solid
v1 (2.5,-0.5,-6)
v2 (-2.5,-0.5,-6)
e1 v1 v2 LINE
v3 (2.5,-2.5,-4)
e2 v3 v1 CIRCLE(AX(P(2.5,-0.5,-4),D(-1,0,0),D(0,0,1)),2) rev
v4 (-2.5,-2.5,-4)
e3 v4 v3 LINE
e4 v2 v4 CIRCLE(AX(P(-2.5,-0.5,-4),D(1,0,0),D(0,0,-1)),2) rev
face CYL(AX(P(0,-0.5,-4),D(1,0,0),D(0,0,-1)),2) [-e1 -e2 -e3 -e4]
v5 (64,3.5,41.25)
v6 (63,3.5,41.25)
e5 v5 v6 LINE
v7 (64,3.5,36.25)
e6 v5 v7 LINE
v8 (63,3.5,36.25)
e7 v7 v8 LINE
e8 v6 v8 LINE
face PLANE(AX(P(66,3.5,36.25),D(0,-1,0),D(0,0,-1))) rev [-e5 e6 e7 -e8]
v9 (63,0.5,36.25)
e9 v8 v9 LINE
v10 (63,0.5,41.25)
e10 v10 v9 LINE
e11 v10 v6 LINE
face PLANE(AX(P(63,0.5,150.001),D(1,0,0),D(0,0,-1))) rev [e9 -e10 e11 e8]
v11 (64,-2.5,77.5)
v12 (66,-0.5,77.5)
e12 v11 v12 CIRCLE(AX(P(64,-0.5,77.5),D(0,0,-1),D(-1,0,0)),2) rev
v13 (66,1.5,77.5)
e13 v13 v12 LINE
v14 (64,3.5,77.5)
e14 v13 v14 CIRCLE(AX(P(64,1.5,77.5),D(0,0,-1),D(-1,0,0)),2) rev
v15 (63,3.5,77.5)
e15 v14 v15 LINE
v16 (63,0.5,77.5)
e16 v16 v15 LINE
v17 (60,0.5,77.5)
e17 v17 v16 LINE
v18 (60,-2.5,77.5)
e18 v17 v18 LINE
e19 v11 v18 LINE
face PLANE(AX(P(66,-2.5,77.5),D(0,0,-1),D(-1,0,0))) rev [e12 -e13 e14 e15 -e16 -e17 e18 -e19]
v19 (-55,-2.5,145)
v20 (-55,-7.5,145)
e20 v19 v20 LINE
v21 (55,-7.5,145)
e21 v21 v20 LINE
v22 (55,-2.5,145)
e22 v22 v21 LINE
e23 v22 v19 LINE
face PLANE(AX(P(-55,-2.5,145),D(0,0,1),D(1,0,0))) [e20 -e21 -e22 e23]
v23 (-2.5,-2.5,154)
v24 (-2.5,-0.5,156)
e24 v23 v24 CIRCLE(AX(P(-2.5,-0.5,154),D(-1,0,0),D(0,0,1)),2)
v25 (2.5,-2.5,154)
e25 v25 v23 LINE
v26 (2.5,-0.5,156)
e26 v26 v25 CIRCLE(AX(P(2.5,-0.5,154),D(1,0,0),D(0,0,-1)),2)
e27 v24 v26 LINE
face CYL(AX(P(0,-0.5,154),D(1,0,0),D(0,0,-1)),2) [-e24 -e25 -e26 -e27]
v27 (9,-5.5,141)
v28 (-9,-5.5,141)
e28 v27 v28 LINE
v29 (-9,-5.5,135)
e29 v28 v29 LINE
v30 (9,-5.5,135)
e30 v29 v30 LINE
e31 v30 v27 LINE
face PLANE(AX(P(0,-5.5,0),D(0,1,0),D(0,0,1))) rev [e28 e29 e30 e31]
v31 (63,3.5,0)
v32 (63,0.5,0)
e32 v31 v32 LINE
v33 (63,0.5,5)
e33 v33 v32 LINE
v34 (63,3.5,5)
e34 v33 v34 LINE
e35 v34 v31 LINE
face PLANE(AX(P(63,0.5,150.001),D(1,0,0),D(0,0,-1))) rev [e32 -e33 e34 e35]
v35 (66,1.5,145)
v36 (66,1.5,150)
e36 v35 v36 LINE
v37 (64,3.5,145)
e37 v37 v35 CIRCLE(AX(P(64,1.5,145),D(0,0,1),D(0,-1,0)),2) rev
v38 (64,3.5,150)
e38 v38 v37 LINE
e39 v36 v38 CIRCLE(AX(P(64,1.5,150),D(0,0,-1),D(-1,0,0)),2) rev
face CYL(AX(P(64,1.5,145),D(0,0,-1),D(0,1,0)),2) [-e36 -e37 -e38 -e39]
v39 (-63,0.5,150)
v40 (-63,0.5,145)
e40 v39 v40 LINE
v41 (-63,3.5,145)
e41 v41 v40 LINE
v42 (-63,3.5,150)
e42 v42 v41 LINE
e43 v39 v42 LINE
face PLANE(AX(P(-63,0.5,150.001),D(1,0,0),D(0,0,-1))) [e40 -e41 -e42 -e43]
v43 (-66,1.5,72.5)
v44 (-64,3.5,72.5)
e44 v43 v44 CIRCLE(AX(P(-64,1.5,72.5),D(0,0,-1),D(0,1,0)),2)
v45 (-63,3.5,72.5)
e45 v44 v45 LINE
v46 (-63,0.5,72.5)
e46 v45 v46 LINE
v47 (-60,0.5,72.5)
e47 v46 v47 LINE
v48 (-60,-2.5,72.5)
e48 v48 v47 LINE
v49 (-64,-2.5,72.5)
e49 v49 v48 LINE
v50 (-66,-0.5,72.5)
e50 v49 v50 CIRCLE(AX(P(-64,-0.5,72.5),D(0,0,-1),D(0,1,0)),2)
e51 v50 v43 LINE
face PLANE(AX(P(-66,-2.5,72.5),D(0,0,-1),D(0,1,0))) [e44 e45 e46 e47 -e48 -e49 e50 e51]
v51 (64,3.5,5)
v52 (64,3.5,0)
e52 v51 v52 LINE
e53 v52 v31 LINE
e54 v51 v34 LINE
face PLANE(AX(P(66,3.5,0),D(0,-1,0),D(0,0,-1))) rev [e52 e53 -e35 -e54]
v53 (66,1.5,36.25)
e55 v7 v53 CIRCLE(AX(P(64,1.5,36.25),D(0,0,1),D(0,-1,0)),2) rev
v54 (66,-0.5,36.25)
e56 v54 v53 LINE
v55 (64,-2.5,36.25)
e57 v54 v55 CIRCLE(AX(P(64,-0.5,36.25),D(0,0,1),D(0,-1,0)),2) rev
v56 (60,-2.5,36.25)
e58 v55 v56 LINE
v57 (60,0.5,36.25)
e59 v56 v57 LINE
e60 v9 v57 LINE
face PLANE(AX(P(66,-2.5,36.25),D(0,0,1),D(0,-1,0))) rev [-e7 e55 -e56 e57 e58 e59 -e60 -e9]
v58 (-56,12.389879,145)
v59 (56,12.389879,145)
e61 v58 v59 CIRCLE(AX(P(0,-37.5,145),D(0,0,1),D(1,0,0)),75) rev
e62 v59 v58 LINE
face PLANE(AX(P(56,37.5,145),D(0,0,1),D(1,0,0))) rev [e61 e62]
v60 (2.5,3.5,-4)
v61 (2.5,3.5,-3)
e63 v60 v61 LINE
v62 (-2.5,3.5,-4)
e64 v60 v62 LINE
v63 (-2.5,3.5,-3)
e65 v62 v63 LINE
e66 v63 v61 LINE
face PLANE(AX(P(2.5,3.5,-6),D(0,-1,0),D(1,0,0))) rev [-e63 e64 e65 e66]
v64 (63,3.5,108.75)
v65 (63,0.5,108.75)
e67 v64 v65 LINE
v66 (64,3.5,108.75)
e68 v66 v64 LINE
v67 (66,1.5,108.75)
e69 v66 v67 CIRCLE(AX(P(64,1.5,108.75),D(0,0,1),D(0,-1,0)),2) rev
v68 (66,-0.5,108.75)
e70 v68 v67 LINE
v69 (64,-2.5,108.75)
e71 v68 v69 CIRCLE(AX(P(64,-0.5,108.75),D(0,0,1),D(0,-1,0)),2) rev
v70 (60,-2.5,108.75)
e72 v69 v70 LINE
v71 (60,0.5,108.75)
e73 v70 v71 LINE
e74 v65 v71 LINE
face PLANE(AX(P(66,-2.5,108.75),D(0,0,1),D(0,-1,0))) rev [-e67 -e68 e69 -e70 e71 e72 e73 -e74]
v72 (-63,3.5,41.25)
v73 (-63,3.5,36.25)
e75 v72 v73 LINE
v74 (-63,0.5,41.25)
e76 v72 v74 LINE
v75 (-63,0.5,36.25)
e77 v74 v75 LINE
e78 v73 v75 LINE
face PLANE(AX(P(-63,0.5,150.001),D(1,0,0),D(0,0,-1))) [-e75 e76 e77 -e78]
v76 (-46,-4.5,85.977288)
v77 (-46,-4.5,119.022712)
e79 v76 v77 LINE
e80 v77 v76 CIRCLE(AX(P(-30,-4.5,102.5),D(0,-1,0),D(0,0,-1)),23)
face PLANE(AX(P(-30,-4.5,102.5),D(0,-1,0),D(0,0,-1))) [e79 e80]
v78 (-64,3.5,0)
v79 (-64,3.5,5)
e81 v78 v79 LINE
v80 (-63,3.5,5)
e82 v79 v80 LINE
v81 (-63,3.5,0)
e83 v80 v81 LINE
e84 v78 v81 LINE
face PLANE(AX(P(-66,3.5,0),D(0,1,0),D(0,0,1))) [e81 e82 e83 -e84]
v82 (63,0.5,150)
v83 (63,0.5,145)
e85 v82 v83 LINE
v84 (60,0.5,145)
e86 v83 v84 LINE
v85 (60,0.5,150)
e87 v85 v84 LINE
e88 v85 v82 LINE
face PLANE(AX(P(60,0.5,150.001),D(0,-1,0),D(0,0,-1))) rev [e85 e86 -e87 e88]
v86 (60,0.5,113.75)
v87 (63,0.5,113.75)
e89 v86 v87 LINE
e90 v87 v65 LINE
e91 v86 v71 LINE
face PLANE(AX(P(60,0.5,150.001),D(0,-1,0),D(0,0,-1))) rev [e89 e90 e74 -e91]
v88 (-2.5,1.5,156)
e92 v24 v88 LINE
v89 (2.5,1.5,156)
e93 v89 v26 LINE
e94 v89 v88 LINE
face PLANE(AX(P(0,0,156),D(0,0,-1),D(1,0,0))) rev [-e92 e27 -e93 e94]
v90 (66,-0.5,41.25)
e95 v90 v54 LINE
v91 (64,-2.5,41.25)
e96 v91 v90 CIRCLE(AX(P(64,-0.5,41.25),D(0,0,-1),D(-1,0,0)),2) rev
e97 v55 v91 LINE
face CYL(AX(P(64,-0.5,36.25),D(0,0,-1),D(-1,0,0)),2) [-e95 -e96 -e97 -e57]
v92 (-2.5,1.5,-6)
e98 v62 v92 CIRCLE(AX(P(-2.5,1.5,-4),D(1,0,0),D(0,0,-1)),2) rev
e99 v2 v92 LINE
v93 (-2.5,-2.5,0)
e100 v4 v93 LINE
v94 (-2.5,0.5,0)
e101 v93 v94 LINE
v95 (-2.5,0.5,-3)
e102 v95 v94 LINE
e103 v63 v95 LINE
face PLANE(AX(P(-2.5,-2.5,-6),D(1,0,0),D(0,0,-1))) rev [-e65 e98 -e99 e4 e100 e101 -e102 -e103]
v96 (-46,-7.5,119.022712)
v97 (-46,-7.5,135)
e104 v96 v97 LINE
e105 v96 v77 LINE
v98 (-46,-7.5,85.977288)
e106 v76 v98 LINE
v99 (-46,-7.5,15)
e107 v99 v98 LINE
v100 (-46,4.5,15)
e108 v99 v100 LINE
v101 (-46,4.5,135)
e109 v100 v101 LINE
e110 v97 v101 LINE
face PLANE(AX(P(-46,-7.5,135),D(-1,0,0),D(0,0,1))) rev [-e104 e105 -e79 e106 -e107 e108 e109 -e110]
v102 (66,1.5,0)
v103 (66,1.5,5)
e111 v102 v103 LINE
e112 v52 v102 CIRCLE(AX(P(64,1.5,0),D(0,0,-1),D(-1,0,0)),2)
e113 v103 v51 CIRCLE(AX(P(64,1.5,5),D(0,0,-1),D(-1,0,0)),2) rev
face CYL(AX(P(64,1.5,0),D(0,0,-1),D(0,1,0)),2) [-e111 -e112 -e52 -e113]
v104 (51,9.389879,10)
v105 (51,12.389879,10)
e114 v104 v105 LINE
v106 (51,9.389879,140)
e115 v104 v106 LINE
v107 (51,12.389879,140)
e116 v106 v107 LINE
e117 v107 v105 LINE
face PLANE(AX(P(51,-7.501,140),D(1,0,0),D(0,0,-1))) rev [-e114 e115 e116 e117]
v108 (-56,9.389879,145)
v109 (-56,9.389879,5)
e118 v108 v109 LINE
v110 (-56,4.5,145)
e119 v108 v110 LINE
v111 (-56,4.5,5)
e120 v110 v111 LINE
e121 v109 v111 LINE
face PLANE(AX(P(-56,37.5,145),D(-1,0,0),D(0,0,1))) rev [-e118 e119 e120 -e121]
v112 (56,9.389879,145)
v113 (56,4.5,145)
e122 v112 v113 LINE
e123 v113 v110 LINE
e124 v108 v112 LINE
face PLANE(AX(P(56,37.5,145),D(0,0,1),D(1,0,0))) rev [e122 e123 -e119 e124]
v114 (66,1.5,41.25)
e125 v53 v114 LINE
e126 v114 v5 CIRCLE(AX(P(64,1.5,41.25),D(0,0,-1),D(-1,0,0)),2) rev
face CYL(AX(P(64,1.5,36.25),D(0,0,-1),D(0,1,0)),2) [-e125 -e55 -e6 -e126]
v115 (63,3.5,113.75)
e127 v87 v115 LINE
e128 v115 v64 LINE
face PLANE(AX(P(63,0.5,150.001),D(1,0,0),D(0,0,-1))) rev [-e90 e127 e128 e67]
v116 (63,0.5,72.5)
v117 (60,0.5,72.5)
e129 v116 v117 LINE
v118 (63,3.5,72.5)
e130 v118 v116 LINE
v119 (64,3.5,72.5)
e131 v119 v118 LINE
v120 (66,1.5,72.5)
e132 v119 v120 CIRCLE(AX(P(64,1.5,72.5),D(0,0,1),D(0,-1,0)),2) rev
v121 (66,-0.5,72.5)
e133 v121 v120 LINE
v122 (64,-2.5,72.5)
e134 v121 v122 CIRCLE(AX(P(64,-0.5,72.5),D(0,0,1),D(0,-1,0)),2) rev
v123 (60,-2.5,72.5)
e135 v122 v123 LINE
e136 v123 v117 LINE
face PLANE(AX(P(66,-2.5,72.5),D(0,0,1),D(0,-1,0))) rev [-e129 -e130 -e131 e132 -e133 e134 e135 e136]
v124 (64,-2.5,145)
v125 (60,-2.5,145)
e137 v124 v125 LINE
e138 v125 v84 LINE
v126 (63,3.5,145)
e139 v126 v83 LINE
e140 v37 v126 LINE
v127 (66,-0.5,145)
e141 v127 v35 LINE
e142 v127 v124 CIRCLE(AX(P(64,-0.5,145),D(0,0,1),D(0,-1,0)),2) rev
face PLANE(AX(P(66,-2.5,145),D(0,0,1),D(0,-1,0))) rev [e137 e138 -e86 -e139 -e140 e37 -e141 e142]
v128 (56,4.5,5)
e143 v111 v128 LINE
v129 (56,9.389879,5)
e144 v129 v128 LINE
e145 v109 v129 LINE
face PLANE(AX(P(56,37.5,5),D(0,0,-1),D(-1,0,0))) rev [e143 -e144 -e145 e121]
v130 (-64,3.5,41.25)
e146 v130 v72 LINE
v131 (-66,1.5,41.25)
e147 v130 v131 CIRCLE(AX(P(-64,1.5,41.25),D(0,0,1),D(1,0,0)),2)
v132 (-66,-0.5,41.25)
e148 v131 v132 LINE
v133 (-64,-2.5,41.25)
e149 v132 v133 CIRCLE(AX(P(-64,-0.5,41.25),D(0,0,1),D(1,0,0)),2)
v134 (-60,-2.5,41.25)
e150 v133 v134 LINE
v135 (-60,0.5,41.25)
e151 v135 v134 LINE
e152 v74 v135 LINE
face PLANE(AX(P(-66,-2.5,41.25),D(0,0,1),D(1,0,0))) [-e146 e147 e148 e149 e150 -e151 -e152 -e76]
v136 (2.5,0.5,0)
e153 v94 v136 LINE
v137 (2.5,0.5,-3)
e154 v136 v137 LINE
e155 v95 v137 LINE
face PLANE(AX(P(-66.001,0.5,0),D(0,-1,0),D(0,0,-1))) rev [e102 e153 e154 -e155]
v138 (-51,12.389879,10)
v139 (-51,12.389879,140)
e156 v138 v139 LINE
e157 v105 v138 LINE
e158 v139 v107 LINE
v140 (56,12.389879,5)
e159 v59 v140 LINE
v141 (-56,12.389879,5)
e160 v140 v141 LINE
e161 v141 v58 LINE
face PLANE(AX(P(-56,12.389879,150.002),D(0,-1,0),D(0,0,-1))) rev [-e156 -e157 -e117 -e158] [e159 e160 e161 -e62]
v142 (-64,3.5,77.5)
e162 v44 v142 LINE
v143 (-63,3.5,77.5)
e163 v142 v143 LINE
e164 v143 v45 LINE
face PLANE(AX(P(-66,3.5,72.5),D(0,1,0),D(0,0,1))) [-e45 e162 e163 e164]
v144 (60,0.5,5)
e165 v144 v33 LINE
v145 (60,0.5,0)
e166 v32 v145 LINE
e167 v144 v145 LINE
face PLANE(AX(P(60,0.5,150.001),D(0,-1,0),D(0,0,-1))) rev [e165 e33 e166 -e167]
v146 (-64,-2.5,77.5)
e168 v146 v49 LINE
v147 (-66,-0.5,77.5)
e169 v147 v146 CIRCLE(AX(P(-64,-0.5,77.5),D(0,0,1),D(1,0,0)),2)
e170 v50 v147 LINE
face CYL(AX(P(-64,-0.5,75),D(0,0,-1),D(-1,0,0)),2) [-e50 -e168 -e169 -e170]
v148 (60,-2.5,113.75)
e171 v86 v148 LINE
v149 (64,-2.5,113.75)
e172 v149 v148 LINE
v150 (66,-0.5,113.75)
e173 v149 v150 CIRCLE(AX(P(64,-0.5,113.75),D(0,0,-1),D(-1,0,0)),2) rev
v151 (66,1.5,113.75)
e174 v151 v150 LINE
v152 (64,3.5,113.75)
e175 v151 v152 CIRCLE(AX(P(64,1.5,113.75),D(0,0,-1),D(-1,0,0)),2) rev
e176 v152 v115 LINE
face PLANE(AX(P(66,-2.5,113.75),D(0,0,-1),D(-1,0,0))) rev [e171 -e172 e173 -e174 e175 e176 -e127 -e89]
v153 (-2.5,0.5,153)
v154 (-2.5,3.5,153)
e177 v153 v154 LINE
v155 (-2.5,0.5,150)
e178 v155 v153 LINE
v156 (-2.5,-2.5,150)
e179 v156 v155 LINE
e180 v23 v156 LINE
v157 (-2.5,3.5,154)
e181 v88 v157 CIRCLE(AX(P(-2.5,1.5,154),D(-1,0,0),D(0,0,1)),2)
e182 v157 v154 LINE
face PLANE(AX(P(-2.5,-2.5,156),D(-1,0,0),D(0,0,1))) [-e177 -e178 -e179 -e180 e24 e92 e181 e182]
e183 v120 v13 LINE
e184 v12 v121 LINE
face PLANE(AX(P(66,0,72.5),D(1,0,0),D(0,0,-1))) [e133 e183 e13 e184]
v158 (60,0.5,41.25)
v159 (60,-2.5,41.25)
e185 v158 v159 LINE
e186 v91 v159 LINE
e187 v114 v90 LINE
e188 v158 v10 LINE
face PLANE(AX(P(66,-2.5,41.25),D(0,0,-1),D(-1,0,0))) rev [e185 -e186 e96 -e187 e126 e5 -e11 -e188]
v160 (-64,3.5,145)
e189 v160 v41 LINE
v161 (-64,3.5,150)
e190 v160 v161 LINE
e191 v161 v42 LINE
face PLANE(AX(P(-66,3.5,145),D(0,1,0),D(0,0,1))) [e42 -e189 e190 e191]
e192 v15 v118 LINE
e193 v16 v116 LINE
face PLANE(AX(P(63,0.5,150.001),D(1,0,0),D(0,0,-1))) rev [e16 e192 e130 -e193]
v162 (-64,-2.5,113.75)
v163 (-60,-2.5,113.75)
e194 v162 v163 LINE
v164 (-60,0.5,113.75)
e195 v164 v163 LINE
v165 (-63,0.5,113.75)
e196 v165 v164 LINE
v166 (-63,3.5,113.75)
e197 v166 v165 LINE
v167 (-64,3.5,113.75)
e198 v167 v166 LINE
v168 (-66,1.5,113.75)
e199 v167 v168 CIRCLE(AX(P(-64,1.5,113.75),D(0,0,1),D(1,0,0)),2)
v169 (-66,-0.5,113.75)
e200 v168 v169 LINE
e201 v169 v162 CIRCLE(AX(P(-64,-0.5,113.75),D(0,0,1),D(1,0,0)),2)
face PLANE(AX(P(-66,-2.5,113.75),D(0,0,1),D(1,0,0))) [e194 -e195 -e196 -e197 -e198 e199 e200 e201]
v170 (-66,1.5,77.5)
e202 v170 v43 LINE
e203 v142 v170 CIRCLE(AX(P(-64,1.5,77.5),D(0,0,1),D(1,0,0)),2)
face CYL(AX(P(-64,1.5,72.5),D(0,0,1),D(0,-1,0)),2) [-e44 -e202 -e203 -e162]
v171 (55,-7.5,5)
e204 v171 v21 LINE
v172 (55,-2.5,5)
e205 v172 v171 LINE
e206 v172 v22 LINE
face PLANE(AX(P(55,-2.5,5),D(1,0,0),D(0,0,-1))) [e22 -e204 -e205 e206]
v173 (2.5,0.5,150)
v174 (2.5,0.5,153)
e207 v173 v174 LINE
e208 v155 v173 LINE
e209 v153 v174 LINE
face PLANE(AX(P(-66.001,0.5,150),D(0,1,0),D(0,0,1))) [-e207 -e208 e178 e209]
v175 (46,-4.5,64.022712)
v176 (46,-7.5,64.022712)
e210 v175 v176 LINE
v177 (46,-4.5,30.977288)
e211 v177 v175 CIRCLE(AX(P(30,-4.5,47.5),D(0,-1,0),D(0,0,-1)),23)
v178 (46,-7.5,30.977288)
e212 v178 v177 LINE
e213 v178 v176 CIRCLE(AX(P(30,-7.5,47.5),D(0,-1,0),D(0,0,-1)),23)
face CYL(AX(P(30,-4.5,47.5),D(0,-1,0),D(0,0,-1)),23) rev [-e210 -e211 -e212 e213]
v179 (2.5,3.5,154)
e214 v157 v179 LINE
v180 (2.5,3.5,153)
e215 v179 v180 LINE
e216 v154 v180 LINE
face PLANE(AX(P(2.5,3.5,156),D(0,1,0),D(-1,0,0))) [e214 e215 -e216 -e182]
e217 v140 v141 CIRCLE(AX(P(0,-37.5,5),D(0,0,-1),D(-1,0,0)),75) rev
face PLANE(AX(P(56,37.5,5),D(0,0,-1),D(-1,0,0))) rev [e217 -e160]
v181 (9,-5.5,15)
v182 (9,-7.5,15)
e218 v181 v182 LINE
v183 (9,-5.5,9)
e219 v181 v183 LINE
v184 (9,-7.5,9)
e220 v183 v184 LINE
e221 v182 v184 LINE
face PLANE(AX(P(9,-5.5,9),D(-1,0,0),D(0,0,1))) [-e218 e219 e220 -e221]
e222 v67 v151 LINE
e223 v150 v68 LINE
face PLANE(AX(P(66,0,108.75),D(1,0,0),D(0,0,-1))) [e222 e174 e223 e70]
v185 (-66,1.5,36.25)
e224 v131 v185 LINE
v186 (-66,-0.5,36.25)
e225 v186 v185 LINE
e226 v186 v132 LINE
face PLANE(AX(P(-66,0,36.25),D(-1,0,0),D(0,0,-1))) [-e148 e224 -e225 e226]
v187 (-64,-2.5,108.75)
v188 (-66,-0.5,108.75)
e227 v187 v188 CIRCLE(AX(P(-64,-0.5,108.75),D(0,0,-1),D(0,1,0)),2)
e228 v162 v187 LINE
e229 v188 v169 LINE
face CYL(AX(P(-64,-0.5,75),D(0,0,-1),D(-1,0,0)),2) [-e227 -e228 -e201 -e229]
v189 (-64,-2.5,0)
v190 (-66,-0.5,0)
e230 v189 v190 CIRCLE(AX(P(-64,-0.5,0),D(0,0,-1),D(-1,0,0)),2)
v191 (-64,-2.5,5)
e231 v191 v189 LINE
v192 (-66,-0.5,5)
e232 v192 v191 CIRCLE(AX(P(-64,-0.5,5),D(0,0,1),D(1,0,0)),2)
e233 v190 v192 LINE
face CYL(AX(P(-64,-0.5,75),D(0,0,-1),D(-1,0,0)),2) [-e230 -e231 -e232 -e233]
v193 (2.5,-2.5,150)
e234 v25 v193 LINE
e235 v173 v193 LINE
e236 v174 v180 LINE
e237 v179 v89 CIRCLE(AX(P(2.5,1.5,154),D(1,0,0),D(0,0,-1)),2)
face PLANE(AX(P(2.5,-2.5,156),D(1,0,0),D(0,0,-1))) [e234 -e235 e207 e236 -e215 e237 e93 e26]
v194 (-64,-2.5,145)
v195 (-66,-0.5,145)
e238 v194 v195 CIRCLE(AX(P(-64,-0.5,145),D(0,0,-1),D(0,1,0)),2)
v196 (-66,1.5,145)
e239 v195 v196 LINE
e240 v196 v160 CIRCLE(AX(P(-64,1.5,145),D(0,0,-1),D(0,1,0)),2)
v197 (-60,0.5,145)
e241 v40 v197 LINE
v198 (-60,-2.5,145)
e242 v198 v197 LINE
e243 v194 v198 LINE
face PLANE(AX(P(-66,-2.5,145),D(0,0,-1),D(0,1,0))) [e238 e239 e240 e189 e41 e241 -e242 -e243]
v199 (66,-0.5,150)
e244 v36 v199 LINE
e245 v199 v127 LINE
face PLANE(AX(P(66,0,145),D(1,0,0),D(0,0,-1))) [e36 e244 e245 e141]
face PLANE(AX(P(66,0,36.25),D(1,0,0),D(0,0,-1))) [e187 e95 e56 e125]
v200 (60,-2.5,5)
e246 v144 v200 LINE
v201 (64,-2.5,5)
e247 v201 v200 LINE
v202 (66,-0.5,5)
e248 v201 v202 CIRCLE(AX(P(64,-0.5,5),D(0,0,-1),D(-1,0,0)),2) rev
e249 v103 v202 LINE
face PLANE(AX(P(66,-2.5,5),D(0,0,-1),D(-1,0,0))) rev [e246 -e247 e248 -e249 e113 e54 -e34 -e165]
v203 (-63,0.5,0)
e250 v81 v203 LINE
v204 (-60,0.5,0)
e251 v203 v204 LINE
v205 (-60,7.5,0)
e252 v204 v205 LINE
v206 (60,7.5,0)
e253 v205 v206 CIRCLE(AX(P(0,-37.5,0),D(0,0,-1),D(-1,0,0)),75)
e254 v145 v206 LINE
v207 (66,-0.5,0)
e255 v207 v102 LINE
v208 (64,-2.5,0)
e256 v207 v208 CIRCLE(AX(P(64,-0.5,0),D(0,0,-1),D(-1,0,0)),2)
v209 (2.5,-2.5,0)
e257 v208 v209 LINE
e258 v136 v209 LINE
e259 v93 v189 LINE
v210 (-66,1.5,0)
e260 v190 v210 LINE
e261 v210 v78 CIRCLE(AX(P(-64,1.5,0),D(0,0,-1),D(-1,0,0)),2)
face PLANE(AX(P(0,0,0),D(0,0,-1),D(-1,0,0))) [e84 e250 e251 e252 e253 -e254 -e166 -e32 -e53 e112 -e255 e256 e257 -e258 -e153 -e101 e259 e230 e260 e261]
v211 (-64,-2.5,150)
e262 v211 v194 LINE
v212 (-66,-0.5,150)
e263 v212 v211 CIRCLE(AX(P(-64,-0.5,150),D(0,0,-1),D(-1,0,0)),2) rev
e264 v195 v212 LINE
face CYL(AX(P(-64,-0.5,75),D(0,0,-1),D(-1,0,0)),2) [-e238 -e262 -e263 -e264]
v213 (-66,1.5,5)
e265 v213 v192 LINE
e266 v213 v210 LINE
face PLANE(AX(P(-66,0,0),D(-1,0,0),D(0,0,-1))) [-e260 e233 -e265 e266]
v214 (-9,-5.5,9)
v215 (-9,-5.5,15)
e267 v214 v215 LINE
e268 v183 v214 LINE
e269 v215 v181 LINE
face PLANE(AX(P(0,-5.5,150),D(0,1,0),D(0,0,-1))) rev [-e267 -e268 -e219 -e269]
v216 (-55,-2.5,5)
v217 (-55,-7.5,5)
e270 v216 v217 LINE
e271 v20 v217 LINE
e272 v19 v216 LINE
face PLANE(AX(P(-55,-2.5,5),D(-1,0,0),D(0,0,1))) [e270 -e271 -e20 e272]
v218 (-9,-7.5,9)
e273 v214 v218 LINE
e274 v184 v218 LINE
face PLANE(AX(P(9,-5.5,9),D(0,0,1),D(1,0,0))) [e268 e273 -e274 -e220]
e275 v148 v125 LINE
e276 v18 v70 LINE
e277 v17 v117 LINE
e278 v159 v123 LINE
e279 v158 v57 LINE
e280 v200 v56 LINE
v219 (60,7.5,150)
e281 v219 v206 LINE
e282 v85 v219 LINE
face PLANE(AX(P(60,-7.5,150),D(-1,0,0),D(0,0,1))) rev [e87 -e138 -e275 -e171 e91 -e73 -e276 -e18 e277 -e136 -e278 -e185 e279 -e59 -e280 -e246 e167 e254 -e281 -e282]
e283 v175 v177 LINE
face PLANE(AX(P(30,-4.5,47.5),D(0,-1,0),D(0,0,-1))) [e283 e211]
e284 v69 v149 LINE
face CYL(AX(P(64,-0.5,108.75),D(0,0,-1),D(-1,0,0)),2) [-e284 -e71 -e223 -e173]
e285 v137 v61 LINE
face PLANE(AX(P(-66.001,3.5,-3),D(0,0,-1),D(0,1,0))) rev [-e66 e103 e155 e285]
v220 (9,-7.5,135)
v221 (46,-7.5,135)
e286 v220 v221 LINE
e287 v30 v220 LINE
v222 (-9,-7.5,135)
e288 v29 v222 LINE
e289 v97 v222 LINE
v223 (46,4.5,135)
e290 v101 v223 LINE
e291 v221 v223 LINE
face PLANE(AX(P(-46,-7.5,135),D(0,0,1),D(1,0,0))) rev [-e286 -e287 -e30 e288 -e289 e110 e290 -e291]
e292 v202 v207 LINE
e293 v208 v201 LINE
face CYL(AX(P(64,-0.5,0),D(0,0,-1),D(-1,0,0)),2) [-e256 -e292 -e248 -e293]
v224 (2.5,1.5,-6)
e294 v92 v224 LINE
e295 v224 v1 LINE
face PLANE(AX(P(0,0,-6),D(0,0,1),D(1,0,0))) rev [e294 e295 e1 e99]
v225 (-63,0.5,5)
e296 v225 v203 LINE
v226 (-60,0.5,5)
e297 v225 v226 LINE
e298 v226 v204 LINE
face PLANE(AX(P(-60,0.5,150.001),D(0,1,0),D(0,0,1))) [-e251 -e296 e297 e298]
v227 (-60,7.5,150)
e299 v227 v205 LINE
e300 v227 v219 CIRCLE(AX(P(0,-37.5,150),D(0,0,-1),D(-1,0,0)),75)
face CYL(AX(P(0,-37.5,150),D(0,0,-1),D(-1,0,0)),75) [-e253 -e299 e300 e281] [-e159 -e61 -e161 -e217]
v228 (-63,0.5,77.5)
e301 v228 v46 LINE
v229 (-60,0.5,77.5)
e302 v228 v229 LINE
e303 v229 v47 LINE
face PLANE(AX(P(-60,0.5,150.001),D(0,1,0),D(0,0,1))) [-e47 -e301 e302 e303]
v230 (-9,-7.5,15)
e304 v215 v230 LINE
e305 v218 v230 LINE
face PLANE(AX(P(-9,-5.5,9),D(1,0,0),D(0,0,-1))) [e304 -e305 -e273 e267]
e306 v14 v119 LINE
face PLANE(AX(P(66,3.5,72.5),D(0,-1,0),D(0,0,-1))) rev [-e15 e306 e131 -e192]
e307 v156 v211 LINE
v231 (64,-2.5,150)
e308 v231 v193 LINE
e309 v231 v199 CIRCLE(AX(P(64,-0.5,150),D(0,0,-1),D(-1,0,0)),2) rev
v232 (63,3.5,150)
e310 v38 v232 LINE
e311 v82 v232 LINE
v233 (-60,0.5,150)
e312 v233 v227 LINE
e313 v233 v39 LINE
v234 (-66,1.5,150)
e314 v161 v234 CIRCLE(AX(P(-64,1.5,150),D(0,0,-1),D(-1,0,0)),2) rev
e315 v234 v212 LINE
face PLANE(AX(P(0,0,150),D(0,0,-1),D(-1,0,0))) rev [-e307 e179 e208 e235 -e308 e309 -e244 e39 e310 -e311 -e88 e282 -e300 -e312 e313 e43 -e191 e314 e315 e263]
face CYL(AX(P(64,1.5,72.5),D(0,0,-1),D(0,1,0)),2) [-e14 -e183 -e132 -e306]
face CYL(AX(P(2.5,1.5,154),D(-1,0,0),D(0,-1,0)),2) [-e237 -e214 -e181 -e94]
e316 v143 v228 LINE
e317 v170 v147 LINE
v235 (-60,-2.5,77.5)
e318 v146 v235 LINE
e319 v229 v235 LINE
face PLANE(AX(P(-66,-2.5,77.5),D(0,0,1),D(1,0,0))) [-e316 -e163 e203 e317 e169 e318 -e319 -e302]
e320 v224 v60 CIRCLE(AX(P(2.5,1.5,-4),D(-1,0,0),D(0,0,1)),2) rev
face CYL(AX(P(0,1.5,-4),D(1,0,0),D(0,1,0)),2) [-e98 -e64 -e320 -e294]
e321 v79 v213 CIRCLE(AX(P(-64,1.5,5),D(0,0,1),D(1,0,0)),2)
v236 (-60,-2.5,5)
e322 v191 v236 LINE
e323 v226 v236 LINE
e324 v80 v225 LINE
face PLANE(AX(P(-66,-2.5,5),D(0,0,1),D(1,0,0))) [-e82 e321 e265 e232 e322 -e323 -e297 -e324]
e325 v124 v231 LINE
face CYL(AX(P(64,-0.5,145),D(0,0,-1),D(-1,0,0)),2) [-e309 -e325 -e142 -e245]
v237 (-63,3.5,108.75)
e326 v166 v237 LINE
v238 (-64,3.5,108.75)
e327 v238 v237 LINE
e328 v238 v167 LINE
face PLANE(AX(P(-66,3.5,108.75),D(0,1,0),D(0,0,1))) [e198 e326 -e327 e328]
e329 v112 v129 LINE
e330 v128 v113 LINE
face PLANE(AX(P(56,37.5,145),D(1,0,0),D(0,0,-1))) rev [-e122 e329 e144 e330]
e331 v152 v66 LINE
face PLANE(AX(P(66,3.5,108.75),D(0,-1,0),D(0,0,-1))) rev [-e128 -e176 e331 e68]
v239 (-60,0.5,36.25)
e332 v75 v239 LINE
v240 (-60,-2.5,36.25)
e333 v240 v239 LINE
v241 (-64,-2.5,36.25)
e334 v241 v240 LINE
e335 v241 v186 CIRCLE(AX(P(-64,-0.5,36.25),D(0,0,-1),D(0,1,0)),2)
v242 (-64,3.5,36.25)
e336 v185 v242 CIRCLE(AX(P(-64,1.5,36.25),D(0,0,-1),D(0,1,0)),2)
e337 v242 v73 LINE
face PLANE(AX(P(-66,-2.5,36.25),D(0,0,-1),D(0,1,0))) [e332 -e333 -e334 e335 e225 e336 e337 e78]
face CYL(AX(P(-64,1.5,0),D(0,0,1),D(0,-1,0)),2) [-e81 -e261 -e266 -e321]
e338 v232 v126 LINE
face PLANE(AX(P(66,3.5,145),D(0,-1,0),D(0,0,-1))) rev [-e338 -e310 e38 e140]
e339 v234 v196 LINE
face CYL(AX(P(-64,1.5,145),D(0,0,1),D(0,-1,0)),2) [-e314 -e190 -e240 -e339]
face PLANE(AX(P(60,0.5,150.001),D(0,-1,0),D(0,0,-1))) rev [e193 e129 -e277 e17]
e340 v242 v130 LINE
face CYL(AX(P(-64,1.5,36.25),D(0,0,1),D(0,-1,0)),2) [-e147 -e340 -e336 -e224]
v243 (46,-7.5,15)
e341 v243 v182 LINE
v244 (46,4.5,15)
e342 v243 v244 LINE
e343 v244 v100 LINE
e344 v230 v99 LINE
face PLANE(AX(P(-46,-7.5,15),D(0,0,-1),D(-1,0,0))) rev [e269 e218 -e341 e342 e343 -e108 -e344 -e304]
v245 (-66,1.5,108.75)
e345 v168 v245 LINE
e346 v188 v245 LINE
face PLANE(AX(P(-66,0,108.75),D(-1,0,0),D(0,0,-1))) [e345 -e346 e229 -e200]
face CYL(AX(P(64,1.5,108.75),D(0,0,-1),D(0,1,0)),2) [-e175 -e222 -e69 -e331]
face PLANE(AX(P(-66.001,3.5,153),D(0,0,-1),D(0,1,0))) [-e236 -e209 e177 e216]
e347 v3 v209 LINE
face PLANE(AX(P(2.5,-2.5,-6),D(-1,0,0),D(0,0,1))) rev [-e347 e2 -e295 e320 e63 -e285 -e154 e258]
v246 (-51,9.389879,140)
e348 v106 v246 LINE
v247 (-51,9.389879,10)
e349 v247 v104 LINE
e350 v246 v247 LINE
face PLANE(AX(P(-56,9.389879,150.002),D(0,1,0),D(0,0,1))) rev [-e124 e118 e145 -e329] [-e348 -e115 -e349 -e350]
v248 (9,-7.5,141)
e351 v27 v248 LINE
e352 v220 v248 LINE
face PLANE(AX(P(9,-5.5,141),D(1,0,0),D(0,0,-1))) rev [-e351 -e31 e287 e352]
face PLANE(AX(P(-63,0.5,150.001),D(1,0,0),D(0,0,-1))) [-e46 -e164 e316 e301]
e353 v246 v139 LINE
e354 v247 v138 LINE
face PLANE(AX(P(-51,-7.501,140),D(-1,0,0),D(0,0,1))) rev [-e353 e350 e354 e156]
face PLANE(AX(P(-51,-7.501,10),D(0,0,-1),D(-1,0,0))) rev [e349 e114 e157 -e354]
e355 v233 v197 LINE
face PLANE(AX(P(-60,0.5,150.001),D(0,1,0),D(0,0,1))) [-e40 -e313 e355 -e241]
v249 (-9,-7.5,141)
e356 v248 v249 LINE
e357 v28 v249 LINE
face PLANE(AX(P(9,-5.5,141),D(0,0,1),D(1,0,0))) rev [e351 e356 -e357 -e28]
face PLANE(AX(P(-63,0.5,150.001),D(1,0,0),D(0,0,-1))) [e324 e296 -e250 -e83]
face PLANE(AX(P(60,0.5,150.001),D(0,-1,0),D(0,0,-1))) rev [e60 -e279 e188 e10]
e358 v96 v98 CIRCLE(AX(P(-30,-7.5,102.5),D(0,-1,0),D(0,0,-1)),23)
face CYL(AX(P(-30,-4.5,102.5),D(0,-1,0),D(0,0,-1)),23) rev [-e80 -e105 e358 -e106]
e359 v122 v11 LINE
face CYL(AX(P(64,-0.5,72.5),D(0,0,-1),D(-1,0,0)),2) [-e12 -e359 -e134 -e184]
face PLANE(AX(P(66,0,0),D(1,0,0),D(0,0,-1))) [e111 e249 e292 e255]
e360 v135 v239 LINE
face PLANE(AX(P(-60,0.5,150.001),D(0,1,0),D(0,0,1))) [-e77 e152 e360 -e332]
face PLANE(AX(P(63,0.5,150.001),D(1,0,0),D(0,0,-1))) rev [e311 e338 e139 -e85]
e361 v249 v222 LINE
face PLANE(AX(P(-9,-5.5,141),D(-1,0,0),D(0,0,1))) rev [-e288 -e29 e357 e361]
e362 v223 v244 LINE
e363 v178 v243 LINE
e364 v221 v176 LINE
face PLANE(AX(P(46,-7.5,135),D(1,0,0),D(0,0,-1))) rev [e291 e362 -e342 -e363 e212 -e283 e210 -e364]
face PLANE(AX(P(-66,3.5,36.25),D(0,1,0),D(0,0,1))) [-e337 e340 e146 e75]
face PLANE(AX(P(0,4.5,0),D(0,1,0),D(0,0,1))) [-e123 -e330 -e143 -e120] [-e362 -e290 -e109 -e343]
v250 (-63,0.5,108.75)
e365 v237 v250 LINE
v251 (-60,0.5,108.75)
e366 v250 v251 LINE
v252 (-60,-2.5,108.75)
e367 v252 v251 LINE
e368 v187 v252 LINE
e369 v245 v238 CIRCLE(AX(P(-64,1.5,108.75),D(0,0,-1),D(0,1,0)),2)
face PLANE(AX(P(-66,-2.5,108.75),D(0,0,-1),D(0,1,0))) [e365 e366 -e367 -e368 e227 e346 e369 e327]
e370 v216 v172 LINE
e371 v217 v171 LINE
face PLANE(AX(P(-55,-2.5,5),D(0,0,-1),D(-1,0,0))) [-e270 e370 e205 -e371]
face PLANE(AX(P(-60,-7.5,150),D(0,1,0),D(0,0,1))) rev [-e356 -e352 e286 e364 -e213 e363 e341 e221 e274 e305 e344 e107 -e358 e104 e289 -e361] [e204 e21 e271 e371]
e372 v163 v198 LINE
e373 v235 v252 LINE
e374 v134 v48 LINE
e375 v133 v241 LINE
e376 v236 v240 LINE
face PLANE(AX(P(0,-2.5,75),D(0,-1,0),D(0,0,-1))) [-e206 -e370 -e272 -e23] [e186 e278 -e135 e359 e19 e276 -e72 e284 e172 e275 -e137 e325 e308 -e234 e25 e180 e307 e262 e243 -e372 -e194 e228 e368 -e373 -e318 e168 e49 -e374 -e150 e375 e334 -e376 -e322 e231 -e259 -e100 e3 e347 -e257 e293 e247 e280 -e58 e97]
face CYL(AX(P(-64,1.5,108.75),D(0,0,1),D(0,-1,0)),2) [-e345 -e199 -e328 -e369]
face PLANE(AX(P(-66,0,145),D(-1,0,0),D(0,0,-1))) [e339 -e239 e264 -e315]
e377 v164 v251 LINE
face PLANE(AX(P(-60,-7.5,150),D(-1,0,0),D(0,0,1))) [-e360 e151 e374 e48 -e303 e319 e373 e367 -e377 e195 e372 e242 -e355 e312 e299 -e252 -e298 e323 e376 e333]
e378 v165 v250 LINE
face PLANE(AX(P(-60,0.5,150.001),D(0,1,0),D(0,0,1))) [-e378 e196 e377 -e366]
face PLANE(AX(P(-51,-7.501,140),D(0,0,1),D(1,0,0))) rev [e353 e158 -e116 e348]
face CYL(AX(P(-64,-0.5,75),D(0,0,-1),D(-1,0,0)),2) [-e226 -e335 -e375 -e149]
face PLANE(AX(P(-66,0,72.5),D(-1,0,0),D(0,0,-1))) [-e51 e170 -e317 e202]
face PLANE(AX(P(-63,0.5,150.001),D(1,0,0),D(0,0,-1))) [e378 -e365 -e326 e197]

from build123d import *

# Parameters (mm, degrees)
SKETCH2_W              = 120
SKETCH2_H              = 15
BOSS_EXTRUDE1_DEPTH    = 150
BOSS_EXTRUDE3_DEPTH    = 150
SKETCH7_W              = 112
SKETCH7_H              = 140
CUT_EXTRUDE1_DEPTH     = 165.890873004
SKETCH8_W              = 92
SKETCH8_H              = 120
CUT_EXTRUDE2_DEPTH     = 165.890873004
SKETCH12_OUTSIDE_W     = 161.458
SKETCH12_OUTSIDE_H     = 191.458
SKETCH12_OUTSIDE_W_2   = 110
SKETCH12_OUTSIDE_H_2   = 140
CUT_EXTRUDE5_DEPTH     = 5
BOSS_EXTRUDE4_REACH    = 163.342
SKETCH14_W             = 112
SKETCH14_H             = 3
CUT_EXTRUDE6_REACH     = 165.495
SKETCH15_W             = 102
SKETCH15_H             = 130
SKETCH16_W             = 5
SKETCH16_H             = 6
BOSS_EXTRUDE5_DEPTH    = 6
CUT_EXTRUDE7_REACH     = 170.114
SKETCH17_W             = 3
SKETCH17_H             = 3
FILLET1_R              = 2
LPATTERN1_COUNT        = 5
LPATTERN1_PITCH        = 36.25
FILLET1_OF_LPATTERN1_R = 2
MIRROR1_DEPTH          = 5
MIRROR1_START          = 36.25
MIRROR1_2_DEPTH        = 5
MIRROR1_START_2        = 72.5
MIRROR1_3_DEPTH        = 5
MIRROR1_START_3        = 108.75
MIRROR1_4_DEPTH        = 5
MIRROR1_START_4        = 145
MIRROR1_5_DEPTH        = 5
SKETCH18_W             = 5
SKETCH18_H             = 6
BOSS_EXTRUDE6_DEPTH    = 6
CUT_EXTRUDE8_REACH     = 171.111
SKETCH19_W             = 3
SKETCH19_H             = 3
FILLET2_R              = 2
FILLET2_OF_MIRROR2_R   = 2
SKETCH20_R             = 23
CUT_EXTRUDE9_DEPTH     = 3
SKETCH21_W             = 18
SKETCH21_H             = 6
CUT_EXTRUDE10_DEPTH    = 2


# Read off the part's stored shape, not the designer's step: Mirror1
with BuildPart() as part:
    # Sketch2 → Boss-Extrude1 (new body)
    with BuildSketch(Plane.XY):
        Rectangle(SKETCH2_W, SKETCH2_H)
    extrude(amount=BOSS_EXTRUDE1_DEPTH)

    # Sketch4 → Boss-Extrude3 (add)
    with BuildSketch(Plane(origin=(0, 0, 0), x_dir=(-1, 0, 0), z_dir=(0, 0, -1))):
        with BuildLine():
            Line((-60, 7.5), (60, 7.5))
            ThreePointArc((60, 7.5), (0, 37.5), (-60, 7.5))
        make_face()
    extrude(amount=-BOSS_EXTRUDE3_DEPTH)

    # Sketch7 → Cut-Extrude1 (cut, through all)
    with BuildSketch(Plane(origin=(0, 4.5, 0), x_dir=(-1, 0, 0), z_dir=(0, -1, 0))):
        with Locations((0, -75)):
            Rectangle(SKETCH7_W, SKETCH7_H)
    extrude(amount=-CUT_EXTRUDE1_DEPTH, mode=Mode.SUBTRACT)

    # Sketch8 → Cut-Extrude2 (cut, through all)
    with BuildSketch(Plane(origin=(0, 4.5, 0), x_dir=(1, 0, 0), z_dir=(0, 1, 0))):
        with Locations((0, -75)):
            Rectangle(SKETCH8_W, SKETCH8_H)
    extrude(amount=-CUT_EXTRUDE2_DEPTH, mode=Mode.SUBTRACT)

    # Sketch12 outside → Cut-Extrude5 (cut)
    with BuildSketch(Plane(origin=(0, -7.5, 0), x_dir=(-1, 0, 0), z_dir=(0, -1, 0))):
        with Locations((0, -75)):
            Rectangle(SKETCH12_OUTSIDE_W, SKETCH12_OUTSIDE_H)
        with Locations((0, -75)):
            Rectangle(SKETCH12_OUTSIDE_W_2, SKETCH12_OUTSIDE_H_2, mode=Mode.SUBTRACT)
    extrude(amount=-CUT_EXTRUDE5_DEPTH, mode=Mode.SUBTRACT)

    # Sketch14 → Boss-Extrude4 (add, up to next)
    with BuildSketch(Plane.XY.offset(5), mode=Mode.PRIVATE) as boss_extrude4_sk1:
        with Locations((0, 10.889878733)):
            Rectangle(SKETCH14_W, SKETCH14_H)
    boss_extrude4_tool1 = extrude(boss_extrude4_sk1.sketch, amount=BOSS_EXTRUDE4_REACH, mode=Mode.PRIVATE) - part.part
    add(boss_extrude4_tool1.solids().sort_by_distance((0, 10.889879, 5))[0])

    # Sketch15 → Cut-Extrude6 (cut, up to next)
    with BuildSketch(Plane(origin=(0, 12.389878733, 0), x_dir=(1, 0, 0), z_dir=(0, 1, 0)), mode=Mode.PRIVATE) as cut_extrude6_sk1:
        with Locations((0, -75)):
            Rectangle(SKETCH15_W, SKETCH15_H)
    cut_extrude6_tool1 = extrude(cut_extrude6_sk1.sketch, amount=-CUT_EXTRUDE6_REACH, mode=Mode.PRIVATE) & part.part
    add(cut_extrude6_tool1.solids().sort_by_distance((0, 12.389879, 75))[0], mode=Mode.SUBTRACT)

    # Sketch16 → Boss-Extrude5 (add)
    with BuildSketch(Plane(origin=(60, 0, 0), x_dir=(0, 0, -1), z_dir=(1, 0, 0))):
        with Locations((-2.5, 0.5)):
            Rectangle(SKETCH16_W, SKETCH16_H)
    boss_extrude5 = extrude(amount=BOSS_EXTRUDE5_DEPTH)

    # Sketch17 → Cut-Extrude7 (cut, up to next)
    with BuildSketch(Plane(origin=(0, 0, 0), x_dir=(-1, 0, 0), z_dir=(0, 0, -1)), mode=Mode.PRIVATE) as cut_extrude7_sk1:
        with Locations((-61.5, 2)):
            Rectangle(SKETCH17_W, SKETCH17_H)
    cut_extrude7_tool1 = extrude(cut_extrude7_sk1.sketch, amount=-CUT_EXTRUDE7_REACH, mode=Mode.PRIVATE) & part.part
    cut_extrude7 = cut_extrude7_tool1.solids().sort_by_distance((61.5, 2, 0))[0]
    add(cut_extrude7, mode=Mode.SUBTRACT)

    # Fillet1
    fillet1_edges = [part.edges().sort_by_distance(p)[0] for p in [
        (66, 3.5, 2.5),
        (66, -2.5, 2.5),
    ]]
    fillet(fillet1_edges, radius=FILLET1_R)

    # LPattern1: Boss-Extrude5, Cut-Extrude7 ×5
    with Locations(*[(0, 0, i * LPATTERN1_PITCH) for i in range(1, LPATTERN1_COUNT)]):
        add(boss_extrude5)
        add(cut_extrude7, mode=Mode.SUBTRACT)

    # Fillet1 of LPattern1
    fillet1_of_lpattern1_edges = [part.edges().sort_by_distance(p)[0] for p in [
        (66, 3.5, 38.75),
        (66, -2.5, 38.75),
        (66, 3.5, 75),
        (66, -2.5, 75),
        (66, 3.5, 111.25),
        (66, -2.5, 111.25),
        (66, 3.5, 147.5),
        (66, -2.5, 147.5),
    ]]
    fillet(fillet1_of_lpattern1_edges, radius=FILLET1_OF_LPATTERN1_R)

    # Mirror1 outline → Mirror1 (add)
    with BuildSketch(Plane.XY):
        with BuildLine():
            Line((-63, 0.5), (-63, 3.5))
            Line((-63, 3.5), (-64, 3.5))
            ThreePointArc((-64, 3.5), (-65.414213562, 2.914213562), (-66, 1.5))
            Line((-66, 1.5), (-66, -0.5))
            ThreePointArc((-66, -0.5), (-65.414213562, -1.914213562), (-64, -2.5))
            Line((-64, -2.5), (-60, -2.5))
            Line((-60, -2.5), (-60, 0.5))
            Line((-60, 0.5), (-63, 0.5))
        make_face()
    extrude(amount=MIRROR1_DEPTH)

    # Mirror1 2 outline → Mirror1 2 (add)
    with BuildSketch(Plane.XY.offset(MIRROR1_START)):
        with BuildLine():
            Line((-63, 0.5), (-63, 3.5))
            Line((-63, 3.5), (-64, 3.5))
            ThreePointArc((-64, 3.5), (-65.414213562, 2.914213562), (-66, 1.5))
            Line((-66, 1.5), (-66, -0.5))
            ThreePointArc((-66, -0.5), (-65.414213562, -1.914213562), (-64, -2.5))
            Line((-64, -2.5), (-60, -2.5))
            Line((-60, -2.5), (-60, 0.5))
            Line((-60, 0.5), (-63, 0.5))
        make_face()
    extrude(amount=MIRROR1_2_DEPTH)

    # Mirror1 3 outline → Mirror1 3 (add)
    with BuildSketch(Plane.XY.offset(MIRROR1_START_2)):
        with BuildLine():
            Line((-63, 0.5), (-63, 3.5))
            Line((-63, 3.5), (-64, 3.5))
            ThreePointArc((-64, 3.5), (-65.414213562, 2.914213562), (-66, 1.5))
            Line((-66, 1.5), (-66, -0.5))
            ThreePointArc((-66, -0.5), (-65.414213562, -1.914213562), (-64, -2.5))
            Line((-64, -2.5), (-60, -2.5))
            Line((-60, -2.5), (-60, 0.5))
            Line((-60, 0.5), (-63, 0.5))
        make_face()
    extrude(amount=MIRROR1_3_DEPTH)

    # Mirror1 4 outline → Mirror1 4 (add)
    with BuildSketch(Plane.XY.offset(MIRROR1_START_3)):
        with BuildLine():
            Line((-63, 0.5), (-63, 3.5))
            Line((-63, 3.5), (-64, 3.5))
            ThreePointArc((-64, 3.5), (-65.414213562, 2.914213562), (-66, 1.5))
            Line((-66, 1.5), (-66, -0.5))
            ThreePointArc((-66, -0.5), (-65.414213562, -1.914213562), (-64, -2.5))
            Line((-64, -2.5), (-60, -2.5))
            Line((-60, -2.5), (-60, 0.5))
            Line((-60, 0.5), (-63, 0.5))
        make_face()
    extrude(amount=MIRROR1_4_DEPTH)

    # Mirror1 5 outline → Mirror1 5 (add)
    with BuildSketch(Plane.XY.offset(MIRROR1_START_4)):
        with BuildLine():
            Line((-63, 0.5), (-63, 3.5))
            Line((-63, 3.5), (-64, 3.5))
            ThreePointArc((-64, 3.5), (-65.414213562, 2.914213562), (-66, 1.5))
            Line((-66, 1.5), (-66, -0.5))
            ThreePointArc((-66, -0.5), (-65.414213562, -1.914213562), (-64, -2.5))
            Line((-64, -2.5), (-60, -2.5))
            Line((-60, -2.5), (-60, 0.5))
            Line((-60, 0.5), (-63, 0.5))
        make_face()
    extrude(amount=MIRROR1_5_DEPTH)

    # Sketch18 → Boss-Extrude6 (add)
    with BuildSketch(Plane(origin=(0, 0, 0), x_dir=(-1, 0, 0), z_dir=(0, 0, -1))):
        with Locations((0, 0.5)):
            Rectangle(SKETCH18_W, SKETCH18_H)
    boss_extrude6 = extrude(amount=BOSS_EXTRUDE6_DEPTH)

    # Sketch19 → Cut-Extrude8 (cut, up to next)
    with BuildSketch(Plane(origin=(2.5, 0, 0), x_dir=(0, 0, -1), z_dir=(1, 0, 0)), mode=Mode.PRIVATE) as cut_extrude8_sk1:
        with Locations((1.5, 2)):
            Rectangle(SKETCH19_W, SKETCH19_H)
    cut_extrude8_tool1 = extrude(cut_extrude8_sk1.sketch, amount=-CUT_EXTRUDE8_REACH, mode=Mode.PRIVATE) & part.part
    cut_extrude8 = cut_extrude8_tool1.solids().sort_by_distance((2.5, 2, -1.5))[0]
    add(cut_extrude8, mode=Mode.SUBTRACT)

    # Fillet2
    fillet2_edges = [part.edges().sort_by_distance(p)[0] for p in [
        (0, -2.5, -6),
        (0, 3.5, -6),
    ]]
    fillet(fillet2_edges, radius=FILLET2_R)

    # Mirror2: Boss-Extrude6, Cut-Extrude8 across plane
    add(boss_extrude6.mirror(Plane.XY.offset(75)))
    add(cut_extrude8.mirror(Plane.XY.offset(75)), mode=Mode.SUBTRACT)

    # Fillet2 of Mirror2
    fillet2_of_mirror2_edges = [part.edges().sort_by_distance(p)[0] for p in [
        (0, -2.5, 156),
        (0, 3.5, 156),
    ]]
    fillet(fillet2_of_mirror2_edges, radius=FILLET2_OF_MIRROR2_R)

    # Sketch20 → Cut-Extrude9 (cut)
    with BuildSketch(Plane(origin=(0, -7.5, 0), x_dir=(-1, 0, 0), z_dir=(0, -1, 0))):
        with Locations((30, -102.5)):
            Circle(SKETCH20_R)
        with Locations((-30, -47.5)):
            Circle(SKETCH20_R)
    extrude(amount=-CUT_EXTRUDE9_DEPTH, mode=Mode.SUBTRACT)

    # Sketch21 → Cut-Extrude10 (cut)
    with BuildSketch(Plane(origin=(0, -7.5, 0), x_dir=(-1, 0, 0), z_dir=(0, -1, 0))):
        with Locations((0, -138)):
            Rectangle(SKETCH21_W, SKETCH21_H)
    cut_extrude10 = extrude(amount=-CUT_EXTRUDE10_DEPTH, mode=Mode.SUBTRACT)

    # Mirror3: Cut-Extrude10 across plane
    add(cut_extrude10.mirror(Plane.XY.offset(75)), mode=Mode.SUBTRACT)


solid = part.part
